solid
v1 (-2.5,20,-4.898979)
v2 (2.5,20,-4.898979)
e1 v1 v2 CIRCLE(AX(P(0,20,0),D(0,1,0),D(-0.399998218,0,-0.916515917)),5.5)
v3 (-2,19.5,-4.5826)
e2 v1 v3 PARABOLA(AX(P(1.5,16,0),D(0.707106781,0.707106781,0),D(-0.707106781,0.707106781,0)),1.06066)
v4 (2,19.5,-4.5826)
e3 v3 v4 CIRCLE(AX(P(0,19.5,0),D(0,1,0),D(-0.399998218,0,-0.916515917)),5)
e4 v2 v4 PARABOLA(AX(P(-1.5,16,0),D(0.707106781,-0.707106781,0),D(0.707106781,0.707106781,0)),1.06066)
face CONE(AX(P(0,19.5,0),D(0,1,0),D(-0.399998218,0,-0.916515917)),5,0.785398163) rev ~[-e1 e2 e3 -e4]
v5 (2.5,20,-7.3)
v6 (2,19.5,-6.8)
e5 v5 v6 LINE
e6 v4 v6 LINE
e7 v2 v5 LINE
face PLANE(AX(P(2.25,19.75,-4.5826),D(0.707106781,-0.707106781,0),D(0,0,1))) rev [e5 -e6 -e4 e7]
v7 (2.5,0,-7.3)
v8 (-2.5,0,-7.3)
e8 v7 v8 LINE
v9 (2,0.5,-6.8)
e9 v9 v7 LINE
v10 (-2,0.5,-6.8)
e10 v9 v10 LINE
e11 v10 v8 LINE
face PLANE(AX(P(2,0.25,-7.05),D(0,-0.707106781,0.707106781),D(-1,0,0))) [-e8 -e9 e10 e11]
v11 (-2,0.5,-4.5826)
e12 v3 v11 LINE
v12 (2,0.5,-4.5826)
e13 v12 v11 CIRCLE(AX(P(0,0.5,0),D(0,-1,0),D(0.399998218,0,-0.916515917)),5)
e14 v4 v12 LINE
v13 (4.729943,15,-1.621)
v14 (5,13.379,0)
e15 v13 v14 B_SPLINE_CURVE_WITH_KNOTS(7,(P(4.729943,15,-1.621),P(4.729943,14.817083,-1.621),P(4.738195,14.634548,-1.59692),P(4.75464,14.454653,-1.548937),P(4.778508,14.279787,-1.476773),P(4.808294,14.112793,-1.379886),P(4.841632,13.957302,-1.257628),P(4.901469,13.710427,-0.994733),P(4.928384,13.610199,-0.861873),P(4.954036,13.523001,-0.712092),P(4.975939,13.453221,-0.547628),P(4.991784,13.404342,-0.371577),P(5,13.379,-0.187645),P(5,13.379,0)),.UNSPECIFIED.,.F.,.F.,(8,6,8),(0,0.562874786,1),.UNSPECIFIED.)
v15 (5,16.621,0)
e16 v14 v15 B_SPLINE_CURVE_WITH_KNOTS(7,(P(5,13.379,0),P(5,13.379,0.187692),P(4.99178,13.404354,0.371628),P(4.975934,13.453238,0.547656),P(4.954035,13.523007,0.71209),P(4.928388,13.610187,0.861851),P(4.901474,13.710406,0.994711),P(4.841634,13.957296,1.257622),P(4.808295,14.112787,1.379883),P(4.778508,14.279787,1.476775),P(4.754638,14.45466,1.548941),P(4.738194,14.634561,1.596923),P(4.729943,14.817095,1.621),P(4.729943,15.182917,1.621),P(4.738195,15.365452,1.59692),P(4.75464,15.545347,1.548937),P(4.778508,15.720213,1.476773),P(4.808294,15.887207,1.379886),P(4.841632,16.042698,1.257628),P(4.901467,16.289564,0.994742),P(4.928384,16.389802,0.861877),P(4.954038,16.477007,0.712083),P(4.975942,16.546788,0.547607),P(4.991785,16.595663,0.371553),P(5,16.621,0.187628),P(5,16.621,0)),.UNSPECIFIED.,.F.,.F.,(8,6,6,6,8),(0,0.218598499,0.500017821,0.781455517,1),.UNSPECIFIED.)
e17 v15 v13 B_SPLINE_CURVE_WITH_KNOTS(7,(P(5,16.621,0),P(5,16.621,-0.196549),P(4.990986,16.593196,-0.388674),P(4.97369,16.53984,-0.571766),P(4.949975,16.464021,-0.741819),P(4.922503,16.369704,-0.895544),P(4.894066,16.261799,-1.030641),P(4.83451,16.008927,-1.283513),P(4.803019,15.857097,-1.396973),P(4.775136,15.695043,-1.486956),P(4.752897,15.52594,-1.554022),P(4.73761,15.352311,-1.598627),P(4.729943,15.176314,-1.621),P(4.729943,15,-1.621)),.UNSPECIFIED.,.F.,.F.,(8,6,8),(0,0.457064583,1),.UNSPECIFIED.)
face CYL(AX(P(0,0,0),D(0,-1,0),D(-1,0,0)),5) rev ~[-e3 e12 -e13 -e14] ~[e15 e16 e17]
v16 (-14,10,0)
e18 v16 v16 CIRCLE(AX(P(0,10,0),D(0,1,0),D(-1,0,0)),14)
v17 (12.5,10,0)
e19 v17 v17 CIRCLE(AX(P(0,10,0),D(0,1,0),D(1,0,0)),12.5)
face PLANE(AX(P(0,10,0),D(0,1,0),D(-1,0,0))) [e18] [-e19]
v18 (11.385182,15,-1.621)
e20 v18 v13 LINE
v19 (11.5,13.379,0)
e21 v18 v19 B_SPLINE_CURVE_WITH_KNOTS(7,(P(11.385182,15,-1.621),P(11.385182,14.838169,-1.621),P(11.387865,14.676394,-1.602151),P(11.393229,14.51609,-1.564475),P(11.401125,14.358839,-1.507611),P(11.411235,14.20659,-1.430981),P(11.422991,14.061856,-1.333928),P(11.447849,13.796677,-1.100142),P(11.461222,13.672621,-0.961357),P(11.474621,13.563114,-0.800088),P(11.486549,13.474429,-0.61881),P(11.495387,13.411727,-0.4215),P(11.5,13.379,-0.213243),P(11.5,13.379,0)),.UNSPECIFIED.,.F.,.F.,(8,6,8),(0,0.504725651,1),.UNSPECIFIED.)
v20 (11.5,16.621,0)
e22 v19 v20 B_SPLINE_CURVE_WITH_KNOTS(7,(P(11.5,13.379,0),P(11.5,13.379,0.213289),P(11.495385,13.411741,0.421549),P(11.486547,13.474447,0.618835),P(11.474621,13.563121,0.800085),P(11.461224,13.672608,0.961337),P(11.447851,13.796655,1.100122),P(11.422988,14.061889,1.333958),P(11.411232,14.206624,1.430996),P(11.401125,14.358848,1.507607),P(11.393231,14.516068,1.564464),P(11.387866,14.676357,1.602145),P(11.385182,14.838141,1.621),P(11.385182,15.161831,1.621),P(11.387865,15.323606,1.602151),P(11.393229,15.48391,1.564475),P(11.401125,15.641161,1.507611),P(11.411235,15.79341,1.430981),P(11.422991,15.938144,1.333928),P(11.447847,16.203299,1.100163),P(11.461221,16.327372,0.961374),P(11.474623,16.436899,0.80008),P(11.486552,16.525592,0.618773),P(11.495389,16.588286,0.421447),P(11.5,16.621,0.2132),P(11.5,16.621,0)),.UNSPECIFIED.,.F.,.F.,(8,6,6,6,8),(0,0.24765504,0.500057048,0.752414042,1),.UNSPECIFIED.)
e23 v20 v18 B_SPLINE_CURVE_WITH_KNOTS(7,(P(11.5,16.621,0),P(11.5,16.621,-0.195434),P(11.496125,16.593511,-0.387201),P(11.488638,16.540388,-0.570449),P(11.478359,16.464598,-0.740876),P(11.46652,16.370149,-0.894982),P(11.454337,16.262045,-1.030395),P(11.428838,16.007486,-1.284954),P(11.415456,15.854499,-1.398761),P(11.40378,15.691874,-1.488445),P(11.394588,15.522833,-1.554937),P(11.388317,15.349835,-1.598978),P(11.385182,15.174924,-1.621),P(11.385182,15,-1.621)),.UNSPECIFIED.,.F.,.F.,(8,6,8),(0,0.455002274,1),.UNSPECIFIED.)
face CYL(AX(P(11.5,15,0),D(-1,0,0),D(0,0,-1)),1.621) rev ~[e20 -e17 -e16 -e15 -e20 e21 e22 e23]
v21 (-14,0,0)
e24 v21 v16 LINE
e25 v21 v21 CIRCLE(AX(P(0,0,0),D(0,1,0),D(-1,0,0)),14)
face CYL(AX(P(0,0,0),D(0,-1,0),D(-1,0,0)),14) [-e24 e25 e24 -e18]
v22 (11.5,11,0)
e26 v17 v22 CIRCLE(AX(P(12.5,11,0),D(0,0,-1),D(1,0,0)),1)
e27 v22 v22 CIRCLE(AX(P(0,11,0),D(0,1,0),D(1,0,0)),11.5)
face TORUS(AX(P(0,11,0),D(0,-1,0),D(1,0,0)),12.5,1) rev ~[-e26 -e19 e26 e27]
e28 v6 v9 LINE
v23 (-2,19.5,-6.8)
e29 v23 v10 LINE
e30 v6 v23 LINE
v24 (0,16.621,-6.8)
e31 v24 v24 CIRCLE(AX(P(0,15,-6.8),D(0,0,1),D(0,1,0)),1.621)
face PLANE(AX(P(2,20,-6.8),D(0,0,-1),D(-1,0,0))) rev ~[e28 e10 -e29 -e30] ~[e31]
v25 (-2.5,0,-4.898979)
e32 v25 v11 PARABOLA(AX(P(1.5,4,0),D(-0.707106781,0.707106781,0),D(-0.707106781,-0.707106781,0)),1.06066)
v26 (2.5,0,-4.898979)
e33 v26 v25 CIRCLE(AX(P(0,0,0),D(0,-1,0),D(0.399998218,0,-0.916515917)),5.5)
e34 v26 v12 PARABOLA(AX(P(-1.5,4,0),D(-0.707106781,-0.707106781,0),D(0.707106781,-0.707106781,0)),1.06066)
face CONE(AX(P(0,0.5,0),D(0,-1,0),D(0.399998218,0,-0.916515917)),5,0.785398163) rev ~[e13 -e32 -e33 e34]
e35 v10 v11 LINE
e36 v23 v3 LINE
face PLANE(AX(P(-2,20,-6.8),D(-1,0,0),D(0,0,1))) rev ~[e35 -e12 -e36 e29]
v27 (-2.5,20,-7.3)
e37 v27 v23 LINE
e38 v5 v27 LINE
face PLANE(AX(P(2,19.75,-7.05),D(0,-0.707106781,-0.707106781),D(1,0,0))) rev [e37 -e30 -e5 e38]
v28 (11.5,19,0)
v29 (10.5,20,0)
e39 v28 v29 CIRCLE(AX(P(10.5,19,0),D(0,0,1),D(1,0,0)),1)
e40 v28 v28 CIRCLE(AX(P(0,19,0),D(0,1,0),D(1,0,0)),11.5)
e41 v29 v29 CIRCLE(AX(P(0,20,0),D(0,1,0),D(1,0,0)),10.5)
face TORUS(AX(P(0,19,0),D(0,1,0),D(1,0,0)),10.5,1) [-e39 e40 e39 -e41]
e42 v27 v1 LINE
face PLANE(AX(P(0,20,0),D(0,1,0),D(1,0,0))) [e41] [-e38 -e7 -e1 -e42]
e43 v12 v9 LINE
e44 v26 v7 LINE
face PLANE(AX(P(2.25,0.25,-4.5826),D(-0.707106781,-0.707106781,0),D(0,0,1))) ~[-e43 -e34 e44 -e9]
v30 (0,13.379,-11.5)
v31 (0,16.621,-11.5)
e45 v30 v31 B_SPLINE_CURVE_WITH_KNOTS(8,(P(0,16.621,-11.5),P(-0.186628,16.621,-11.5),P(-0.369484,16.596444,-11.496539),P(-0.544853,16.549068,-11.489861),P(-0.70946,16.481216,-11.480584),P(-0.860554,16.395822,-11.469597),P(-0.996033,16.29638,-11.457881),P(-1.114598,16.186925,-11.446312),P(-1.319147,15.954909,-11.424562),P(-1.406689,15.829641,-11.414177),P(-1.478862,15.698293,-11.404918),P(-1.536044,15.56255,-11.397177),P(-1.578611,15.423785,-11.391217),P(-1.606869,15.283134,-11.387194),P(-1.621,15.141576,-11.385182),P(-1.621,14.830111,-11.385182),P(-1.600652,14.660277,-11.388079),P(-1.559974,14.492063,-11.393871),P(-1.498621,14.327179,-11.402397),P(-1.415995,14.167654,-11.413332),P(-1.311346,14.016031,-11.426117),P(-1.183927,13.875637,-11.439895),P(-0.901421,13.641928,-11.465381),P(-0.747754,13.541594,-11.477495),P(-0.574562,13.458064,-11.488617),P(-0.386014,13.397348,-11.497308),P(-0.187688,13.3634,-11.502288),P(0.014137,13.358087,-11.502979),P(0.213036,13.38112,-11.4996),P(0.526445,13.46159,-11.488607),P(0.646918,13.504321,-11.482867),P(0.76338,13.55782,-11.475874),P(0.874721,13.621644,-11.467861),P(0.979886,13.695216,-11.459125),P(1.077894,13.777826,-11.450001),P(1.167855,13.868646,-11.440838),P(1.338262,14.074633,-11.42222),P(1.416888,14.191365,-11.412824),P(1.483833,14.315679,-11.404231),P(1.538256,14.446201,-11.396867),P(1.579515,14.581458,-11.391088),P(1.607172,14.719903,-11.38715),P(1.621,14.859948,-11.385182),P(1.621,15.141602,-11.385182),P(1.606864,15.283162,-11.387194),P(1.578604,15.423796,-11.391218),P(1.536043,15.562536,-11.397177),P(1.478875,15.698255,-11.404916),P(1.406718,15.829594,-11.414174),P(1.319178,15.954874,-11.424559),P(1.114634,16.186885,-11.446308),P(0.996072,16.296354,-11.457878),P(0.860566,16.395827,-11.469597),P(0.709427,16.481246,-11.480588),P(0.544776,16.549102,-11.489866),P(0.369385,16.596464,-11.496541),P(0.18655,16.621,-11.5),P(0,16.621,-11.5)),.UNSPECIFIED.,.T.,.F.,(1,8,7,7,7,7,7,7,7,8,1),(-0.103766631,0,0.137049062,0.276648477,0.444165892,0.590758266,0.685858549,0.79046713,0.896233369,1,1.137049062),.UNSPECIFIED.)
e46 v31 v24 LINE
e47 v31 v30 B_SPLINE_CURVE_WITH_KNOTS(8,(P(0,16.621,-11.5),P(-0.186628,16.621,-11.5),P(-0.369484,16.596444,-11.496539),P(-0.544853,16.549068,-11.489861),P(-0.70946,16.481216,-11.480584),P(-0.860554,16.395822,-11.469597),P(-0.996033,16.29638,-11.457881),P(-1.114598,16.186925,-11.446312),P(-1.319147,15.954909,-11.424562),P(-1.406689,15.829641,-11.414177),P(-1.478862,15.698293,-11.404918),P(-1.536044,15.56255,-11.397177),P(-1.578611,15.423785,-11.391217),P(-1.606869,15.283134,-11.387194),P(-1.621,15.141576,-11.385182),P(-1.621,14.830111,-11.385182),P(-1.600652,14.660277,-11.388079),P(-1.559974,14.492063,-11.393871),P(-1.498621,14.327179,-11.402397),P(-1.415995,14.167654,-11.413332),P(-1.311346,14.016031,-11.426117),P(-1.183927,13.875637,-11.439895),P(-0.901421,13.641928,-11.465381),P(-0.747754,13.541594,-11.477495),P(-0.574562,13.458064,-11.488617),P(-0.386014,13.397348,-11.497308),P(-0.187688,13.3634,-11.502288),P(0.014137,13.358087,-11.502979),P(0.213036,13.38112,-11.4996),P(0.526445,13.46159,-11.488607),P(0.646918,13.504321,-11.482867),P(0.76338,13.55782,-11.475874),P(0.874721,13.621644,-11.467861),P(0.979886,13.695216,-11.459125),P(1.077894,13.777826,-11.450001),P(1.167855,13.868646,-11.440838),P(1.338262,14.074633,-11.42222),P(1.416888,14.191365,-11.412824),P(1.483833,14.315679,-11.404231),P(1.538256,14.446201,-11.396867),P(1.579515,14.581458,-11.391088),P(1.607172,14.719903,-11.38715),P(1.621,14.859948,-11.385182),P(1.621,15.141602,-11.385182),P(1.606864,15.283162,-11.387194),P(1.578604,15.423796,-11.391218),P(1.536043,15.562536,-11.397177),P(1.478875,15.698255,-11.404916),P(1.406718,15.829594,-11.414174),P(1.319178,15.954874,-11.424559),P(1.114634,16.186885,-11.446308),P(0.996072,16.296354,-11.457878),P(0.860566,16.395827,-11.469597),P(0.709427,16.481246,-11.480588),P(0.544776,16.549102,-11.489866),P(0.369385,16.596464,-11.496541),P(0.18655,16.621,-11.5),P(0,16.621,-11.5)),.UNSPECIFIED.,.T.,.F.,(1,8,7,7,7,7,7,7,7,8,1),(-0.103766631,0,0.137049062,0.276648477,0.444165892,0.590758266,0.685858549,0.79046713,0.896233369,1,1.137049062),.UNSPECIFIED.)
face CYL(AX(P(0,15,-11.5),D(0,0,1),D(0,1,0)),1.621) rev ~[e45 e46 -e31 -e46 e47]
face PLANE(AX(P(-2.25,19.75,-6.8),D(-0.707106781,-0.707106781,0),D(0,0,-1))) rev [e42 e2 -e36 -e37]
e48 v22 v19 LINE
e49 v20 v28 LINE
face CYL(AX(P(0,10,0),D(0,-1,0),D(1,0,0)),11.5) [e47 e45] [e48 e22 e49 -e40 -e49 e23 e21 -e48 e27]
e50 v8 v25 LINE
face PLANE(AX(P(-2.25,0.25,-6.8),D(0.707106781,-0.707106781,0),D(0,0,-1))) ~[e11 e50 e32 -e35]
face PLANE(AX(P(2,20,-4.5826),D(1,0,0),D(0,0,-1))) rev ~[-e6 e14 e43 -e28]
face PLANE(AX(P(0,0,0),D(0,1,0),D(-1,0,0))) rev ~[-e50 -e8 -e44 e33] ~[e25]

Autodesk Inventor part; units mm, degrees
ref_plane "XZ Plane" through (0, 0, 0) normal (0, 1, 0) x (-1, 0, 0)
sketch "Sketch1" plane through (0, 0, 0) normal (0, 1, 0) x (-1, 0, 0)
  circle A0 centre (0, 0) radius 5
  circle A1 centre (0, 0) radius 14
  dimension "d0" = 10
  dimension "d1" = 28
extrude "Extrusion1" add sketch "Sketch1" along normal blind 10
sketch "Sketch2" plane through (0, 10, 0) normal (0, 1, 0) x (1, 0, 0)
  circle A0 centre (0, 0) radius 11.5
  circle A1 centre (0, 0) radius 5 projected
  dimension "d4" = 23
extrude "Extrusion2" add sketch "Sketch2" along normal blind 10
fillet "Fillet1" radius 1 1 edges at (-11.5, 10, 0)
ref_plane "Work Plane1" through (11.5, 10, 0) normal (1, 0, 0) x (0, 1, 0)
fillet "Fillet2" radius 1 1 edges at (-11.5, 20, 0)
ref_plane "Work Plane2" through (0, 10, -11.5) normal (0, 0, 1) x (1, 0, 0)
sketch "Sketch4" plane through (0, 10, -11.5) normal (0, 0, 1) x (1, 0, 0)
  line L0 (-10.5, 10) -> (10.5, 10) projected
  point P0 (0, -10)
  point P1 (0, 5)
  dimension "d21" = 5
  dimension "d22" = 0
sketch "Sketch3" plane through (11.5, 10, 0) normal (1, 0, 0) x (0, 1, 0)
  line L0 (10, -11.5) -> (10, 11.5) projected
  point P0 (-10, 0)
  point P1 (5, 0)
  dimension "d8" = 5
  dimension "d9" = 0
hole "Hole1" at (11.5, 15, 0) direction (-1, 0, 0) diameter 3.242 end up to surface thread size "M4x0.7" class "6H" standard "ISO Metric profile"
hole "Hole2" at (0, 15, -11.5) direction (0, 0, 1) diameter 3.242 end up to surface thread size "M4x0.7" class "6H" standard "ISO Metric profile"
sketch "Sketch5" plane through (0, 20, 0) normal (0, 1, 0) x (1, 0, 0)
  line L0 (-2, 4.5826) -> (2, 4.5826)
  line L1 (2, 4.5826) -> (2, 6.8)
  line L2 (2, 6.8) -> (-2, 6.8)
  line L3 (-2, 6.8) -> (-2, 4.5826)
  circle A0 centre (0, 0) radius 5 projected
  dimension "d30" = 4
  dimension "d31" = 6.8
extrude "Extrusion3" cut sketch "Sketch5" against normal through all contours A0 L0 | L3 L2 L1 A0 picked at (0.3405, 4.6866)
chamfer "Chamfer2" distance 0.5 angle 45 8 edges at (-2, 20, -5.6913) (0, 20, -6.8) (2, 20, -5.6913) (0, 20, 5) (0, 0, -6.8) (-2, 0, -5.6913) (2, 0, -5.6913) (0, 0, 5)
sketch "Sketch6" plane through (0, 0, 0) normal (0, -1, 0) x (1, 0, 0)
  circle A0 centre (0, 0) radius 15
  dimension "d37" = 30
sketch "Sketch7" plane through (0, 10, 0) normal (0, 1, 0) x (1, 0, 0)
  circle A0 centre (0, 0) radius 15
  dimension "d38" = 30
properties part number "gear_khk_SUS1-28J10" material "Steel, High Strength, Low Alloy"
